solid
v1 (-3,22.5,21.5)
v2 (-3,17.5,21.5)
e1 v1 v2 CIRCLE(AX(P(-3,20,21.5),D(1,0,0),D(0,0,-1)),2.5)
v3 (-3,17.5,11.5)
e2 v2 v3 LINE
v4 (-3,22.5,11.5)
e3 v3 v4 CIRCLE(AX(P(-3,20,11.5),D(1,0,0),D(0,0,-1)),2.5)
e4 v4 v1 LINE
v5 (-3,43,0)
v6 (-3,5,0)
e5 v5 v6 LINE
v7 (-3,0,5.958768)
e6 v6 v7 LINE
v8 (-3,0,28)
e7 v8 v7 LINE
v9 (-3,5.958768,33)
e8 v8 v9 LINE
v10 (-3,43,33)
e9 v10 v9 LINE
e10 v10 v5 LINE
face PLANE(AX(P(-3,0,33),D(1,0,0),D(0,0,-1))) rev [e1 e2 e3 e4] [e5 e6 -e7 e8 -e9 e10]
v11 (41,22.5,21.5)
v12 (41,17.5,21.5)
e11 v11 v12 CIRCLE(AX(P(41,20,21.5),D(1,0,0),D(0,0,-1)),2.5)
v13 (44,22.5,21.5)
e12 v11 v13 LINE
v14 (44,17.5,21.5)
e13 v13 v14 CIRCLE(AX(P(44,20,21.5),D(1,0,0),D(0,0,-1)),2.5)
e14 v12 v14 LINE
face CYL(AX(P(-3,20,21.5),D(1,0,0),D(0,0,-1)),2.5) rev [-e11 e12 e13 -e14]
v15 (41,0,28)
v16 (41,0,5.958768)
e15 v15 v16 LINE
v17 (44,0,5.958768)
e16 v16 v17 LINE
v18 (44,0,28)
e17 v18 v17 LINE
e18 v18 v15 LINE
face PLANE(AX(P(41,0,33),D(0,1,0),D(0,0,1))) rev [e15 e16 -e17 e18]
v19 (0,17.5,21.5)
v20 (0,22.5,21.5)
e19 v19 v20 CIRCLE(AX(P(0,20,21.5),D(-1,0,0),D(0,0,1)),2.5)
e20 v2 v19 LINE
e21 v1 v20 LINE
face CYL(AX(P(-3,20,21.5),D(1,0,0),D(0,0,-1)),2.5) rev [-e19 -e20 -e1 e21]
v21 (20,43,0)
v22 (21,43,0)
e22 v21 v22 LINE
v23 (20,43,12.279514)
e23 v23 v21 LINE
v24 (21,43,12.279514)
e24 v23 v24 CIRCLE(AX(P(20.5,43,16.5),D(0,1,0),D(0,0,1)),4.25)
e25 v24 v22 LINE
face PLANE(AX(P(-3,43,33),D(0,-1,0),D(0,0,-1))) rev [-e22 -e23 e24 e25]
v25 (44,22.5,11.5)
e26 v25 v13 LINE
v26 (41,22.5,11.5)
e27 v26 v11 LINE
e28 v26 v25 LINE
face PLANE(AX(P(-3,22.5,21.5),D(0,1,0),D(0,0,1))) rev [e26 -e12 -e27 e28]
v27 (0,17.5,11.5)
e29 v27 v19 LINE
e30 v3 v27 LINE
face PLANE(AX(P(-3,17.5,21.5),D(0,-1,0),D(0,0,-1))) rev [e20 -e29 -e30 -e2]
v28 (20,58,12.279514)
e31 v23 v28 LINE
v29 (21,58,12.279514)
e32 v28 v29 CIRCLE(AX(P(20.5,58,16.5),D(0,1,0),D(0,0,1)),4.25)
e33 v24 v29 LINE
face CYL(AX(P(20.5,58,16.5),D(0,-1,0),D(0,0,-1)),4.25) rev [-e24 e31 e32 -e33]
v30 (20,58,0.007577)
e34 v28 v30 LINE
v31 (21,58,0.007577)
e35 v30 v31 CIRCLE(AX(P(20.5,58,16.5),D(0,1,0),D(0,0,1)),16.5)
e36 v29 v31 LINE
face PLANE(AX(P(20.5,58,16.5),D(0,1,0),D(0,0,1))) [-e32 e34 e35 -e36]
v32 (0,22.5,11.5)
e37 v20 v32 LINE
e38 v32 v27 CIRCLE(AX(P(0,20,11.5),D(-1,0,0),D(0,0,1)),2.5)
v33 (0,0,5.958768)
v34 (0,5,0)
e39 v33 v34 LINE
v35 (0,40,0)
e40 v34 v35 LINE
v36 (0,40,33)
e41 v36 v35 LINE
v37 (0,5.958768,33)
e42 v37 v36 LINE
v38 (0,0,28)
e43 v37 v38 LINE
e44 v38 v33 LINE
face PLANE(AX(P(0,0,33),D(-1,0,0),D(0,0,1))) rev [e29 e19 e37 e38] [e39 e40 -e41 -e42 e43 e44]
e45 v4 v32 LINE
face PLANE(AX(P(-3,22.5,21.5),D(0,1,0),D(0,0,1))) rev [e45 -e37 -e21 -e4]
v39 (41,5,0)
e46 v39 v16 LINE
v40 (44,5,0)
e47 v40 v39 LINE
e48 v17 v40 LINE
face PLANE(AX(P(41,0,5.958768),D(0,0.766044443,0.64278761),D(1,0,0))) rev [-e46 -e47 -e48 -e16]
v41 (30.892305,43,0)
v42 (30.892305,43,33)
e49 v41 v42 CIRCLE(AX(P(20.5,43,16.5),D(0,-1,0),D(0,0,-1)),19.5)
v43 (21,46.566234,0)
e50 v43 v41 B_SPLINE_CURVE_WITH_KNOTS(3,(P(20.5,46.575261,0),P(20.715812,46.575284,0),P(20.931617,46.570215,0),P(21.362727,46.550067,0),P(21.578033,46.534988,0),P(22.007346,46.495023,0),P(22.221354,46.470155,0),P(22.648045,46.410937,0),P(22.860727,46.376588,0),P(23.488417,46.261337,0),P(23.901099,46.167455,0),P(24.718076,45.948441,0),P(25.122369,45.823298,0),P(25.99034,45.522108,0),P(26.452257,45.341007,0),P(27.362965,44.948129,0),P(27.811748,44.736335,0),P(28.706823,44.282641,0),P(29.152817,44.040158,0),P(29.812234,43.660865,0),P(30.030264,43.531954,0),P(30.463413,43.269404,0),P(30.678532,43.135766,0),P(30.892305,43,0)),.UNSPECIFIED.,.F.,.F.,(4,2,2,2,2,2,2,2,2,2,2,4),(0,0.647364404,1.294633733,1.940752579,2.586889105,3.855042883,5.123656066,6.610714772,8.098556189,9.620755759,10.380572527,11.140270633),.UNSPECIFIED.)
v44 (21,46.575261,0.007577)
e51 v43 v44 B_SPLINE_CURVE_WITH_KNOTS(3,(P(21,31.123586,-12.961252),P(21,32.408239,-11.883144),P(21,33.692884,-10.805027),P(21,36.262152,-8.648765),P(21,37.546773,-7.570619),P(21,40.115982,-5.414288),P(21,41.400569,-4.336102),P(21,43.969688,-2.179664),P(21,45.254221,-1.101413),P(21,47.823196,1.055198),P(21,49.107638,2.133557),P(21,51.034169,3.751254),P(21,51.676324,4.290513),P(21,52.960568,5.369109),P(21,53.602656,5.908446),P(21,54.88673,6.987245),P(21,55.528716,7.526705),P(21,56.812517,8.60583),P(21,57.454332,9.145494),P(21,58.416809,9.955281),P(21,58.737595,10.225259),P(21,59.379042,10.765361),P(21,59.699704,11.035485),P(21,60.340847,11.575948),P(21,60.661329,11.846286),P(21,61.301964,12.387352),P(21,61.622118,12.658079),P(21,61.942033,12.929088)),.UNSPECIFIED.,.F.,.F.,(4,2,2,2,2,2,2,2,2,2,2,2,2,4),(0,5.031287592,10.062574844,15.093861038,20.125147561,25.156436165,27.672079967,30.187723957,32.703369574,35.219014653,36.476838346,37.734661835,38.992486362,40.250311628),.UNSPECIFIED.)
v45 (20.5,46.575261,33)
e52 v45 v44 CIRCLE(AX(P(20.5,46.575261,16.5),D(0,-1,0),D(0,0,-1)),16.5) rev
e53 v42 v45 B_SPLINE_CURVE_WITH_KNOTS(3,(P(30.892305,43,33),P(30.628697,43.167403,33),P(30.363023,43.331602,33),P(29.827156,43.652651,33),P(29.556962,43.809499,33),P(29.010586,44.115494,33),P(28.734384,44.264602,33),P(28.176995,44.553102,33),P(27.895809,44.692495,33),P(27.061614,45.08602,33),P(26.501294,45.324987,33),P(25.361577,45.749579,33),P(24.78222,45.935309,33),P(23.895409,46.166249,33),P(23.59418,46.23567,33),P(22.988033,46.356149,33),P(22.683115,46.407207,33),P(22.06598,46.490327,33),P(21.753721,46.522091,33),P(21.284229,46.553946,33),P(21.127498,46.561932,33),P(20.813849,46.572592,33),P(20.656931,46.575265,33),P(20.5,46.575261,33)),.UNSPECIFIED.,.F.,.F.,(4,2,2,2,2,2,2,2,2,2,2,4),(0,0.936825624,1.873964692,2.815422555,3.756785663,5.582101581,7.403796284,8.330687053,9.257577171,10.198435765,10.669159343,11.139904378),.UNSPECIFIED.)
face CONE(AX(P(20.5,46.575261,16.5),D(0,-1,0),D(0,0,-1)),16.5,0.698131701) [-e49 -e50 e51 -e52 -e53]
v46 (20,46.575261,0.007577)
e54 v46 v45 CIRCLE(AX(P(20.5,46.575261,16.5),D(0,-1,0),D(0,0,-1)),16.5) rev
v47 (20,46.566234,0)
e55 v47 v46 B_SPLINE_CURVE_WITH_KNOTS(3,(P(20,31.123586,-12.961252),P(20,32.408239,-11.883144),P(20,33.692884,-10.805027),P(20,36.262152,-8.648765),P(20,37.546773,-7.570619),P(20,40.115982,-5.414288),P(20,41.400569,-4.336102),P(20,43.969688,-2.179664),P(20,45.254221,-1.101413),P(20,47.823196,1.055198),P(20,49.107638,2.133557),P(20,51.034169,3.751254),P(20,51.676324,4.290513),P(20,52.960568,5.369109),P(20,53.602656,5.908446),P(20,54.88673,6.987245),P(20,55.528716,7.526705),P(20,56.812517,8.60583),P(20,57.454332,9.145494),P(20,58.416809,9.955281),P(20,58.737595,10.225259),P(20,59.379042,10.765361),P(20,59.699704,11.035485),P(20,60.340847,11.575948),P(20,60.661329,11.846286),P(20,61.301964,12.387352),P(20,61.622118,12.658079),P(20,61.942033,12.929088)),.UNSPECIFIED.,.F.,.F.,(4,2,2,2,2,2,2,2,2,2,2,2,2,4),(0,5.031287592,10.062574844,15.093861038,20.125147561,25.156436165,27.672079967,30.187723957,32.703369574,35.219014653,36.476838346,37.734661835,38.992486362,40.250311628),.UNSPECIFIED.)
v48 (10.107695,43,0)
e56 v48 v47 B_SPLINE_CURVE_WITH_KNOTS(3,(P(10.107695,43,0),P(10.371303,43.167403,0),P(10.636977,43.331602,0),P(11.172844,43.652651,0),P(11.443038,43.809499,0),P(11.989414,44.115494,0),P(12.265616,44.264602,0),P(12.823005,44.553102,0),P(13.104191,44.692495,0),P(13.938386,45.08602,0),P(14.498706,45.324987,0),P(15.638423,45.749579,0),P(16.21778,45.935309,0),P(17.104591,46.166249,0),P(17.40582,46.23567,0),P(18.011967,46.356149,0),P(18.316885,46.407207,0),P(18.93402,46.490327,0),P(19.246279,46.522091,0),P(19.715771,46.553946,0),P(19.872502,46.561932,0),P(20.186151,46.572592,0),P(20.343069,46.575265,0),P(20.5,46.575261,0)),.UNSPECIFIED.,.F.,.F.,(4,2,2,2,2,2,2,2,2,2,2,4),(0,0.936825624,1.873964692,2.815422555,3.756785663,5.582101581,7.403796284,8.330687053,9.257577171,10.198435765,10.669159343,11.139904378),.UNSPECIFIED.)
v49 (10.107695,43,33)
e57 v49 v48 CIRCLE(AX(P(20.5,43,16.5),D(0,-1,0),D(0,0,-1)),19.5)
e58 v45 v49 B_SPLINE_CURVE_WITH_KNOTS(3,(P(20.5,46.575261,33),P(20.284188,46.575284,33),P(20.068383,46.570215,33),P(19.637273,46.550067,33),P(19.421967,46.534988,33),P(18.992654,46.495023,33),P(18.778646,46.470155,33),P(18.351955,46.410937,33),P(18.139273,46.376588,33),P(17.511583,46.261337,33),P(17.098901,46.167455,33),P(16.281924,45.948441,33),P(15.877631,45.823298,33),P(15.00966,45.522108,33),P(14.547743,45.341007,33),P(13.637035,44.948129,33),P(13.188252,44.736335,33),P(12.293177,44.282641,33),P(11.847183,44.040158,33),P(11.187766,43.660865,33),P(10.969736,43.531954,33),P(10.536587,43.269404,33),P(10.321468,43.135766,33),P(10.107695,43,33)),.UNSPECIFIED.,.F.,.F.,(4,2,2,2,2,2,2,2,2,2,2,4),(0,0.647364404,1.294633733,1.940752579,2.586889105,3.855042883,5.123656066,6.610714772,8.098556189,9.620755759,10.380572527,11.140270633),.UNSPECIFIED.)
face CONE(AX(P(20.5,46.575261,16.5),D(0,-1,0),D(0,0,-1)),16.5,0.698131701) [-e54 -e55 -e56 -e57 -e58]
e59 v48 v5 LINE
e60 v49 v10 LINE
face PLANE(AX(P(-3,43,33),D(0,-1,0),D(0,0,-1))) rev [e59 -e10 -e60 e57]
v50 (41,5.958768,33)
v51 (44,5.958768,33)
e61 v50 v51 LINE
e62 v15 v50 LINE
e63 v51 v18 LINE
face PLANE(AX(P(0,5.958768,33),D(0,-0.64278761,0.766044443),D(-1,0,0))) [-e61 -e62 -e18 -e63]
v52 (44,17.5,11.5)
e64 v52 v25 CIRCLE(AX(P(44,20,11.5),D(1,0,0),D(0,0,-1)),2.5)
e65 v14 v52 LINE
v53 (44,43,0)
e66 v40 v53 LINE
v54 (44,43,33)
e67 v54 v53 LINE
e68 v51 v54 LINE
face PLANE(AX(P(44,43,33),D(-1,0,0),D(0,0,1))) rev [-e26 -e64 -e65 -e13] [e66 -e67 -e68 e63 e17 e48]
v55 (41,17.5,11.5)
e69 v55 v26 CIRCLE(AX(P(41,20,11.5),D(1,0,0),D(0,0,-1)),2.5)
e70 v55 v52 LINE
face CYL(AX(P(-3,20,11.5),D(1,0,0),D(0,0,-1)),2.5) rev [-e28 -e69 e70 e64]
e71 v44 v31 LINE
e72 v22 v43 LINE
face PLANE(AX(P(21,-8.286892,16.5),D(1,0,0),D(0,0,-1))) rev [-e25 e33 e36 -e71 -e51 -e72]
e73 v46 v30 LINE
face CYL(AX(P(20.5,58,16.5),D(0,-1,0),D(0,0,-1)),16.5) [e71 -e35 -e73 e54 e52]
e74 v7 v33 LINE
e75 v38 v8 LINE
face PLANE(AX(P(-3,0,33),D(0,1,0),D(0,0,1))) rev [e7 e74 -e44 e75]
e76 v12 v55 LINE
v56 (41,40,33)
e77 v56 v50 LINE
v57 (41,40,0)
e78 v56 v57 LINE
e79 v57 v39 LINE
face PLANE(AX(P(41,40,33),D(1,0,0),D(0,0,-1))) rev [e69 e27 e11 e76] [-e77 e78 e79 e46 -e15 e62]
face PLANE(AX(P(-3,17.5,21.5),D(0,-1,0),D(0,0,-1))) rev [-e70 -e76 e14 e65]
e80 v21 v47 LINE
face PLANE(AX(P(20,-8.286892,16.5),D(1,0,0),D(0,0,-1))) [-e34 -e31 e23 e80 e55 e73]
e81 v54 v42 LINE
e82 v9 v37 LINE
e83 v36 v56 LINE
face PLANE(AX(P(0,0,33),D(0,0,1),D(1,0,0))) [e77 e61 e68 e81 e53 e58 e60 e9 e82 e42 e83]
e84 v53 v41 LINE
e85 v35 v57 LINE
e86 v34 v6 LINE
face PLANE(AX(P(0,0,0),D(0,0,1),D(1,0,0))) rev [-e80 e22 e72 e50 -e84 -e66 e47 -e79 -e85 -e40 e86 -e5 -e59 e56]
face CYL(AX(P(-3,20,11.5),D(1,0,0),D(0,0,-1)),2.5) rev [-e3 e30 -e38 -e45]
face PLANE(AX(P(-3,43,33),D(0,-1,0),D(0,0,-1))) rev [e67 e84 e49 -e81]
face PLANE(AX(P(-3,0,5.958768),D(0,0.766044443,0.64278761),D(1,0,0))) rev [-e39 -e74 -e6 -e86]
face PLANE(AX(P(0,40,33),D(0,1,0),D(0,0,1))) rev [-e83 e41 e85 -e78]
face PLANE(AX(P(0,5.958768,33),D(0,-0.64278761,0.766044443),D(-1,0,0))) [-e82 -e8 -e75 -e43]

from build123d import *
from OCP.BRepFilletAPI import BRepFilletAPI_MakeChamfer

# Parameters (mm, degrees)
BOSS_EXTRUDE1_DEPTH     = 33
CUT_EXTRUDE2_DEPTH      = 70.814038703
CUT_EXTRUDE2_DEPTH_BACK = 70.814038703
SKETCH5_R               = 16.5
SKETCH5_R_2             = 4.25
BOSS_EXTRUDE2_DEPTH     = 15
CHAMFER1_SIZE           = 3
CHAMFER1_SIZE_2         = 3.575260778
CUT_EXTRUDE_THIN1_START = -15
SKETCH6_W               = 1
SKETCH6_H               = 51.277142369
CUT_EXTRUDE_THIN1_DEPTH = 15
CHAMFER2_SIZE           = 5
CHAMFER2_SIZE2          = 5.958767963


with BuildPart() as part:
    # Sketch1 → Boss-Extrude1 (new body)
    with BuildSketch(Plane.XY):
        Polygon((0, 0), (0, 40), (41, 40), (41, 0), (44, 0), (44, 43), (-3, 43), (-3, 0), align=None)
    extrude(amount=BOSS_EXTRUDE1_DEPTH)

    # Sketch4 → Cut-Extrude2 (cut, two sides: drawn at the far end of the back side and taken through both)
    with BuildSketch(Plane(origin=(0, 0, 0), x_dir=(0, 0, -1), z_dir=(1, 0, 0)).offset(-CUT_EXTRUDE2_DEPTH_BACK)):
        with BuildLine():
            Line((-21.5, 22.5), (-11.5, 22.5))
            ThreePointArc((-11.5, 22.5), (-9, 20), (-11.5, 17.5))
            Line((-11.5, 17.5), (-21.5, 17.5))
            ThreePointArc((-21.5, 17.5), (-24, 20), (-21.5, 22.5))
        make_face()
    extrude(amount=CUT_EXTRUDE2_DEPTH + CUT_EXTRUDE2_DEPTH_BACK, mode=Mode.SUBTRACT)

    # Sketch5 → Boss-Extrude2 (add)
    with BuildSketch(Plane(origin=(0, 43, 0), x_dir=(1, 0, 0), z_dir=(0, 1, 0))):
        with Locations(Location((20.5, -16.5, 0), (0, 0, 270))):
            Circle(SKETCH5_R)
        with Locations(Location((20.5, -16.5, 0), (0, 0, 270))):
            Circle(SKETCH5_R_2, mode=Mode.SUBTRACT)
    extrude(amount=BOSS_EXTRUDE2_DEPTH)

    # Chamfer1
    # the kernel refuses this chamfer: 3.575260778, 3 mm, written as the material it adds along each edge
    with BuildSketch(Plane(origin=(20.5, 43, 16.5), x_dir=(0, 0, -1), z_dir=(1, 0, 0))) as chamfer1_piece_1_section:
        Polygon((16.5 + CHAMFER1_SIZE, 0), (16.5, CHAMFER1_SIZE_2), (16.5, 0), align=None)
    chamfer1_piece_1 = revolve(axis=Axis((20.5, 43, 16.5), (0, 1, 0)), revolution_arc=180, mode=Mode.PRIVATE)
    chamfer1_piece_1 = split(chamfer1_piece_1, bisect_by=Plane(origin=(2.547299358, 44.747941515, 0), z_dir=(0, 0, 1)), keep=Keep.TOP, mode=Mode.PRIVATE)
    chamfer1_piece_1 = split(chamfer1_piece_1, bisect_by=Plane(origin=(2.547299358, 44.747941515, 33), z_dir=(0, 0, -1)), keep=Keep.TOP, mode=Mode.PRIVATE)
    add(chamfer1_piece_1)
    with BuildSketch(Plane(origin=(20.5, 43, 16.5), x_dir=(0, 0, 1), z_dir=(-1, 0, 0))) as chamfer1_piece_2_section:
        Polygon((16.5 + CHAMFER1_SIZE, 0), (16.5, CHAMFER1_SIZE_2), (16.5, 0), align=None)
    chamfer1_piece_2 = revolve(axis=Axis((20.5, 43, 16.5), (0, 1, 0)), revolution_arc=180, mode=Mode.PRIVATE)
    chamfer1_piece_2 = split(chamfer1_piece_2, bisect_by=Plane(origin=(38.452700642, 44.747941515, 0), z_dir=(0, 0, 1)), keep=Keep.TOP, mode=Mode.PRIVATE)
    chamfer1_piece_2 = split(chamfer1_piece_2, bisect_by=Plane(origin=(38.452700642, 44.747941515, 33), z_dir=(0, 0, -1)), keep=Keep.TOP, mode=Mode.PRIVATE)
    add(chamfer1_piece_2)

    # Sketch6 → Cut-Extrude-Thin1 (cut)
    with BuildSketch(Plane(origin=(0, 58, 0), x_dir=(1, 0, 0), z_dir=(0, 1, 0)).offset(CUT_EXTRUDE_THIN1_START)):
        with Locations((20.5, 9.138571185)):
            Rectangle(SKETCH6_W, SKETCH6_H)
    extrude(amount=CUT_EXTRUDE_THIN1_DEPTH, mode=Mode.SUBTRACT)

    # Chamfer2: one chamfer whose edges measure the first distance from different faces: ONE call of the kernel's chamfer builder (chamfer() names one face for all edges)
    chamfer2_edges_1 = [part.edges().sort_by_distance(p)[0] for p in [
        (-1.5, 0, 0),
        (42.5, 0, 0),
    ]]
    chamfer2_side_1 = [part.faces().sort_by_distance(p)[0] for p in [
        (25.936545793, 44.827539599, 0),
    ]]
    chamfer2_edges_2 = [part.edges().sort_by_distance(p)[0] for p in [
        (42.5, 0, 33),
    ]]
    chamfer2_side_2 = [part.faces().sort_by_distance(p)[0] for p in [
        (42.5, 0, 16.5),
    ]]
    chamfer2_edges_3 = [part.edges().sort_by_distance(p)[0] for p in [
        (-1.5, 0, 33),
    ]]
    chamfer2_side_3 = [part.faces().sort_by_distance(p)[0] for p in [
        (-1.5, 0, 16.5),
    ]]
    chamfer2 = BRepFilletAPI_MakeChamfer(part.part.solid().wrapped)
    for e in chamfer2_edges_1:
        chamfer2.Add(CHAMFER2_SIZE, CHAMFER2_SIZE2, e.wrapped, chamfer2_side_1[0].wrapped)  # the first distance lies on this face
    for e in chamfer2_edges_2:
        chamfer2.Add(CHAMFER2_SIZE, CHAMFER2_SIZE2, e.wrapped, chamfer2_side_2[0].wrapped)  # the first distance lies on this face
    for e in chamfer2_edges_3:
        chamfer2.Add(CHAMFER2_SIZE, CHAMFER2_SIZE2, e.wrapped, chamfer2_side_3[0].wrapped)  # the first distance lies on this face
    add(Compound.cast(chamfer2.Shape()), mode=Mode.REPLACE)


solid = part.part
